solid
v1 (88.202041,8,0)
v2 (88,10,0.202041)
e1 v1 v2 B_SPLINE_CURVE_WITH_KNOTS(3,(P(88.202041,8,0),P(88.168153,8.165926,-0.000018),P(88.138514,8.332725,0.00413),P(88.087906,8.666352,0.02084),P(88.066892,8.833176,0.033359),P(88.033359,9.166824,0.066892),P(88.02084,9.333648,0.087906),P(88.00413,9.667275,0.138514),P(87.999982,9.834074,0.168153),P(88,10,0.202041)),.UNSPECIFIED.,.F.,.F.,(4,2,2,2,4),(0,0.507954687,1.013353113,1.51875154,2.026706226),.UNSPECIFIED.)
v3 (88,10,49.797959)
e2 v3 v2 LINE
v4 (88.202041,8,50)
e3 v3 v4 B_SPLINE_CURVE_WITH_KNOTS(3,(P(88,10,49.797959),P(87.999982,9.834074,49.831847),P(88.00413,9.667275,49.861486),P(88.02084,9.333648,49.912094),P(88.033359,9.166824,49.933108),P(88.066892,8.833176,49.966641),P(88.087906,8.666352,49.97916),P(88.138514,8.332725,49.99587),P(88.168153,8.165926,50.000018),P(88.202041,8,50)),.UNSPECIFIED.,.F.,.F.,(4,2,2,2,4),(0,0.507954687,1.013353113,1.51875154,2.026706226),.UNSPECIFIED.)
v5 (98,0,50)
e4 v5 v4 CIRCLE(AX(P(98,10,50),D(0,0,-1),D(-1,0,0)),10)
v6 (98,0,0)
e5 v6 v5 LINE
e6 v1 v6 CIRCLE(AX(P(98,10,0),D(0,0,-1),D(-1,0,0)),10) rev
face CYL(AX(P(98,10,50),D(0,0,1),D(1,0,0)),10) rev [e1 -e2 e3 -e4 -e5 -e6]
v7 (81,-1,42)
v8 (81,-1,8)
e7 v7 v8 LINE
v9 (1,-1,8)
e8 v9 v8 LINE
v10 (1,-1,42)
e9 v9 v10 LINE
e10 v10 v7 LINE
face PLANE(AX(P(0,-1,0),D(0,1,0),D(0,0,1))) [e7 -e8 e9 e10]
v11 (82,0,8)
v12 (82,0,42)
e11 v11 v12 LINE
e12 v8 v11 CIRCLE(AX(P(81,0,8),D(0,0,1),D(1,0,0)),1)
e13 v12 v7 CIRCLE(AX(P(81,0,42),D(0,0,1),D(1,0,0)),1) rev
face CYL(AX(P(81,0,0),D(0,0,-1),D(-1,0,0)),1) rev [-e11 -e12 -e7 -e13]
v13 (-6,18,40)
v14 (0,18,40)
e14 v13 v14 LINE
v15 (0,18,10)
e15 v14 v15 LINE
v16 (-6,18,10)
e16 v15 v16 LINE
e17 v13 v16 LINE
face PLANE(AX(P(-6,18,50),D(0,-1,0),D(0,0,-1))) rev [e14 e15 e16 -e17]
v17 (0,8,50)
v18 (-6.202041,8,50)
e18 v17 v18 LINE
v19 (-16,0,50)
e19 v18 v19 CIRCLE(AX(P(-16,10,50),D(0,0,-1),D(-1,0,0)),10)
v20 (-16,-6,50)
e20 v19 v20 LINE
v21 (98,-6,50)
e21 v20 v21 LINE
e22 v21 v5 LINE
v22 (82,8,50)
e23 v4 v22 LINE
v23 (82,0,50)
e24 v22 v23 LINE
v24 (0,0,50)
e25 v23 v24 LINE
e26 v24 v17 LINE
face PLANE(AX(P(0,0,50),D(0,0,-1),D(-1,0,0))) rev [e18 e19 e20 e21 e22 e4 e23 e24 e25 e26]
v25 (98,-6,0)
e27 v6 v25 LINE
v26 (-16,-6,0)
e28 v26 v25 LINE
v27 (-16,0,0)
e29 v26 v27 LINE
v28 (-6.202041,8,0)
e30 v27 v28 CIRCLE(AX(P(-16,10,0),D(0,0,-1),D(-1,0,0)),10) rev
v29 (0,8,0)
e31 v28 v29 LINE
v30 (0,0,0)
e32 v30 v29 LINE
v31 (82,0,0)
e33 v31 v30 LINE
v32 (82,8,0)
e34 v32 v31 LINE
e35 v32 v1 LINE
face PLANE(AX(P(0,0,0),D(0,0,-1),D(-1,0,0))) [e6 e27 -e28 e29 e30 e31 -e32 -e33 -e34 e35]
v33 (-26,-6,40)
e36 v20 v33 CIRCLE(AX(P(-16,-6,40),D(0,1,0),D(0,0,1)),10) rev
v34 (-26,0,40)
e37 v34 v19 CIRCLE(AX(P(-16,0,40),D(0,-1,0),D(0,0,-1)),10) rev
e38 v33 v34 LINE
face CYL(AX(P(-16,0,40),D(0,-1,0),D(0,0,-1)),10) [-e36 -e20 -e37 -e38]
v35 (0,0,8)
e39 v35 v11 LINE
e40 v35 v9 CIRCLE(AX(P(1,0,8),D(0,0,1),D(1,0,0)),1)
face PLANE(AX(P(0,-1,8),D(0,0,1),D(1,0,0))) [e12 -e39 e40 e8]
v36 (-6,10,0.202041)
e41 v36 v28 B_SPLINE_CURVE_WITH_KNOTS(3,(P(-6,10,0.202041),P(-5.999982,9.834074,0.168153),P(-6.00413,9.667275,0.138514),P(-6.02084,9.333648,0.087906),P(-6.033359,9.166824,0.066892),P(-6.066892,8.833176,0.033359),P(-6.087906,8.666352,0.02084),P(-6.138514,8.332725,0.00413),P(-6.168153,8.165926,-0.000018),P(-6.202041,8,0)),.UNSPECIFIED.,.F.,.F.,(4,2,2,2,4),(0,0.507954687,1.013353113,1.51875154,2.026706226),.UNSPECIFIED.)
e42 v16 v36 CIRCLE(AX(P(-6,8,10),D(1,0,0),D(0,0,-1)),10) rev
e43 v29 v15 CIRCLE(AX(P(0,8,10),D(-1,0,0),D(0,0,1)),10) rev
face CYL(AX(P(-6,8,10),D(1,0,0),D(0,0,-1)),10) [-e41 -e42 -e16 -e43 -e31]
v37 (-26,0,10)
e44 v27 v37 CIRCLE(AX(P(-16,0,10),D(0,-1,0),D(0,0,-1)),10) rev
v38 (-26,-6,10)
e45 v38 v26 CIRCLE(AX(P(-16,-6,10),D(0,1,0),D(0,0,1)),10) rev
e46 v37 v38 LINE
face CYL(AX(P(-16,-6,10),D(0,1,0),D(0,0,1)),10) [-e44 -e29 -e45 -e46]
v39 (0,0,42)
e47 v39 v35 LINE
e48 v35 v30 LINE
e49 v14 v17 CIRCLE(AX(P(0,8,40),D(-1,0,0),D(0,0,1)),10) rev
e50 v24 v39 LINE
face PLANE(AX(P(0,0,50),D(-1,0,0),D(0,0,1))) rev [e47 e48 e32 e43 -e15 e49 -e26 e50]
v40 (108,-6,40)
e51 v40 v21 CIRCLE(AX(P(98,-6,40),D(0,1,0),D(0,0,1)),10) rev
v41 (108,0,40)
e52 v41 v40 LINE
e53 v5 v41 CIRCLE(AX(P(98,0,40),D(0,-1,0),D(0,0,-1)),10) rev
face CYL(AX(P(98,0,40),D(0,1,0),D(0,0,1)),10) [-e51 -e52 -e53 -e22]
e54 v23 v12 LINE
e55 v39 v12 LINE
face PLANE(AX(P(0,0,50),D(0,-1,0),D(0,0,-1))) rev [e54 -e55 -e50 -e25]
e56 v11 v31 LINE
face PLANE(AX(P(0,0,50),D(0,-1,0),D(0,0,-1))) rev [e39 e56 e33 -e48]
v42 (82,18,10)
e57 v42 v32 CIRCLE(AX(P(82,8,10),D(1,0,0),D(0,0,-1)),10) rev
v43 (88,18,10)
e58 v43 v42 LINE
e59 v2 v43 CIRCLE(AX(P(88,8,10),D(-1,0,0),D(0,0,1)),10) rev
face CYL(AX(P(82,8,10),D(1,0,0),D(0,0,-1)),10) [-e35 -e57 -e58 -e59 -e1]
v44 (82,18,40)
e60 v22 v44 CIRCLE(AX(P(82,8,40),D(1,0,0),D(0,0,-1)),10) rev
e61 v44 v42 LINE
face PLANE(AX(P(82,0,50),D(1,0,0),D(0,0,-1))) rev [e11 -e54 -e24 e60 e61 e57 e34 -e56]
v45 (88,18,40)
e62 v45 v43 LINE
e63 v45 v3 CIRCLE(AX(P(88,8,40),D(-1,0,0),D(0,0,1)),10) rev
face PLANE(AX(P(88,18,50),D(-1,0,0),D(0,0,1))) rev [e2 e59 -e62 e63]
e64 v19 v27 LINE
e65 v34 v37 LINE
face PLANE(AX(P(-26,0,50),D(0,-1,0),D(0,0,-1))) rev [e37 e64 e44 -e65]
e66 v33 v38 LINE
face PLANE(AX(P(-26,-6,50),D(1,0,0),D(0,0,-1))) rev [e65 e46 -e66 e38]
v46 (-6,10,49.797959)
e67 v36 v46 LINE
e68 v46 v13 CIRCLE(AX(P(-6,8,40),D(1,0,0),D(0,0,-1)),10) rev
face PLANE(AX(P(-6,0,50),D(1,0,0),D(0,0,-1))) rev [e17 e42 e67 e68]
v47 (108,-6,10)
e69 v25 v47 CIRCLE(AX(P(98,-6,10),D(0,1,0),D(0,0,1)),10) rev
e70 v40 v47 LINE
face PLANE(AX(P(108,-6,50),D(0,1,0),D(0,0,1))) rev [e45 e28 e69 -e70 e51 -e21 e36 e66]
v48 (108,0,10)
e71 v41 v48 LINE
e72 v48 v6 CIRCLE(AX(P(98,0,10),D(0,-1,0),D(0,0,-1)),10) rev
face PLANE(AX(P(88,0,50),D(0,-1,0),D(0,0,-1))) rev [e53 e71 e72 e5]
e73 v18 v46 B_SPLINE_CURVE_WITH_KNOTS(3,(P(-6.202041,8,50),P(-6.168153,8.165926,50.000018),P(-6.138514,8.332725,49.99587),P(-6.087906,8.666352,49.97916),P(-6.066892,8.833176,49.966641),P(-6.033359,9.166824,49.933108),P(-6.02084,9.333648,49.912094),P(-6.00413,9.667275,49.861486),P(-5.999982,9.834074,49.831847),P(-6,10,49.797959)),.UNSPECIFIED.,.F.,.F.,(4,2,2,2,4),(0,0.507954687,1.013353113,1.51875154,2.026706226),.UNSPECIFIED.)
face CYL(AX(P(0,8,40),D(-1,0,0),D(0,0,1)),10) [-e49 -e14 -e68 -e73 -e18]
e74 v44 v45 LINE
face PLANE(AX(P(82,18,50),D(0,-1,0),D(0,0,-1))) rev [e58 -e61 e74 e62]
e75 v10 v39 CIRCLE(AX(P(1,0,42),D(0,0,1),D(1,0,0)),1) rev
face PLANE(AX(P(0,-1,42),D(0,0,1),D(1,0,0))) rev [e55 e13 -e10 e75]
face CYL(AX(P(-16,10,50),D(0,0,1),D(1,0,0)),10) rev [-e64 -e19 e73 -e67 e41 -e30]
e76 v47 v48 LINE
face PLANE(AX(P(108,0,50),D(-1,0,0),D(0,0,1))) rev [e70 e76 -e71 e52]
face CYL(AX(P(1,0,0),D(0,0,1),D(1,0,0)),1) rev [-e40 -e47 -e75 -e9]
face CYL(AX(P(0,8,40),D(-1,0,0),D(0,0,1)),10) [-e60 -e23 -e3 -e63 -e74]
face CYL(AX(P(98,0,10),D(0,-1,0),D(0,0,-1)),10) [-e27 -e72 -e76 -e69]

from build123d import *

# Parameters (mm, degrees)
BOSS_EXTRUDE1_DEPTH = 50
FILLET1_R           = 10
FILLET2_R           = 10
SKETCH2_W           = 82
SKETCH2_H           = 34
CUT_EXTRUDE1_DEPTH  = 1
FILLET3_R           = 1


with BuildPart() as part:
    # Sketch1 → Boss-Extrude1 (new body)
    with BuildSketch(Plane.XY):
        Polygon((0, 0), (82, 0), (82, 18), (88, 18), (88, 0), (108, 0), (108, -6), (0, -6), (-6, -6), (-26, -6), (-26, 0), (-6, 0), (-6, 18), (0, 18), align=None)
    extrude(amount=BOSS_EXTRUDE1_DEPTH)

    # Fillet1
    fillet1_edges = [part.edges().sort_by_distance(p)[0] for p in [
        (88, 0, 25),
        (-6, 0, 25),
        (108, -3, 0),
        (108, -3, 50),
        (-26, -3, 0),
        (-26, -3, 50),
    ]]
    fillet(fillet1_edges, radius=FILLET1_R - 0.0001)  # a hair under: the kernel refuses the full size

    # Fillet2
    fillet2_edges = [part.edges().sort_by_distance(p)[0] for p in [
        (85, 18, 50),
        (85, 18, 0),
        (-3, 18, 0),
        (-3, 18, 50),
    ]]
    fillet(fillet2_edges, radius=FILLET2_R)

    # Sketch2 → Cut-Extrude1 (cut)
    with BuildSketch(Plane(origin=(0, 0, 0), x_dir=(1, 0, 0), z_dir=(0, 1, 0))):
        with Locations((41, -25)):
            Rectangle(SKETCH2_W, SKETCH2_H)
    extrude(amount=-CUT_EXTRUDE1_DEPTH, mode=Mode.SUBTRACT)

    # Fillet3
    fillet3_edges = [part.edges().sort_by_distance(p)[0] for p in [
        (82, -1, 25),
        (0, -1, 25),
    ]]
    fillet(fillet3_edges, radius=FILLET3_R)


solid = part.part
